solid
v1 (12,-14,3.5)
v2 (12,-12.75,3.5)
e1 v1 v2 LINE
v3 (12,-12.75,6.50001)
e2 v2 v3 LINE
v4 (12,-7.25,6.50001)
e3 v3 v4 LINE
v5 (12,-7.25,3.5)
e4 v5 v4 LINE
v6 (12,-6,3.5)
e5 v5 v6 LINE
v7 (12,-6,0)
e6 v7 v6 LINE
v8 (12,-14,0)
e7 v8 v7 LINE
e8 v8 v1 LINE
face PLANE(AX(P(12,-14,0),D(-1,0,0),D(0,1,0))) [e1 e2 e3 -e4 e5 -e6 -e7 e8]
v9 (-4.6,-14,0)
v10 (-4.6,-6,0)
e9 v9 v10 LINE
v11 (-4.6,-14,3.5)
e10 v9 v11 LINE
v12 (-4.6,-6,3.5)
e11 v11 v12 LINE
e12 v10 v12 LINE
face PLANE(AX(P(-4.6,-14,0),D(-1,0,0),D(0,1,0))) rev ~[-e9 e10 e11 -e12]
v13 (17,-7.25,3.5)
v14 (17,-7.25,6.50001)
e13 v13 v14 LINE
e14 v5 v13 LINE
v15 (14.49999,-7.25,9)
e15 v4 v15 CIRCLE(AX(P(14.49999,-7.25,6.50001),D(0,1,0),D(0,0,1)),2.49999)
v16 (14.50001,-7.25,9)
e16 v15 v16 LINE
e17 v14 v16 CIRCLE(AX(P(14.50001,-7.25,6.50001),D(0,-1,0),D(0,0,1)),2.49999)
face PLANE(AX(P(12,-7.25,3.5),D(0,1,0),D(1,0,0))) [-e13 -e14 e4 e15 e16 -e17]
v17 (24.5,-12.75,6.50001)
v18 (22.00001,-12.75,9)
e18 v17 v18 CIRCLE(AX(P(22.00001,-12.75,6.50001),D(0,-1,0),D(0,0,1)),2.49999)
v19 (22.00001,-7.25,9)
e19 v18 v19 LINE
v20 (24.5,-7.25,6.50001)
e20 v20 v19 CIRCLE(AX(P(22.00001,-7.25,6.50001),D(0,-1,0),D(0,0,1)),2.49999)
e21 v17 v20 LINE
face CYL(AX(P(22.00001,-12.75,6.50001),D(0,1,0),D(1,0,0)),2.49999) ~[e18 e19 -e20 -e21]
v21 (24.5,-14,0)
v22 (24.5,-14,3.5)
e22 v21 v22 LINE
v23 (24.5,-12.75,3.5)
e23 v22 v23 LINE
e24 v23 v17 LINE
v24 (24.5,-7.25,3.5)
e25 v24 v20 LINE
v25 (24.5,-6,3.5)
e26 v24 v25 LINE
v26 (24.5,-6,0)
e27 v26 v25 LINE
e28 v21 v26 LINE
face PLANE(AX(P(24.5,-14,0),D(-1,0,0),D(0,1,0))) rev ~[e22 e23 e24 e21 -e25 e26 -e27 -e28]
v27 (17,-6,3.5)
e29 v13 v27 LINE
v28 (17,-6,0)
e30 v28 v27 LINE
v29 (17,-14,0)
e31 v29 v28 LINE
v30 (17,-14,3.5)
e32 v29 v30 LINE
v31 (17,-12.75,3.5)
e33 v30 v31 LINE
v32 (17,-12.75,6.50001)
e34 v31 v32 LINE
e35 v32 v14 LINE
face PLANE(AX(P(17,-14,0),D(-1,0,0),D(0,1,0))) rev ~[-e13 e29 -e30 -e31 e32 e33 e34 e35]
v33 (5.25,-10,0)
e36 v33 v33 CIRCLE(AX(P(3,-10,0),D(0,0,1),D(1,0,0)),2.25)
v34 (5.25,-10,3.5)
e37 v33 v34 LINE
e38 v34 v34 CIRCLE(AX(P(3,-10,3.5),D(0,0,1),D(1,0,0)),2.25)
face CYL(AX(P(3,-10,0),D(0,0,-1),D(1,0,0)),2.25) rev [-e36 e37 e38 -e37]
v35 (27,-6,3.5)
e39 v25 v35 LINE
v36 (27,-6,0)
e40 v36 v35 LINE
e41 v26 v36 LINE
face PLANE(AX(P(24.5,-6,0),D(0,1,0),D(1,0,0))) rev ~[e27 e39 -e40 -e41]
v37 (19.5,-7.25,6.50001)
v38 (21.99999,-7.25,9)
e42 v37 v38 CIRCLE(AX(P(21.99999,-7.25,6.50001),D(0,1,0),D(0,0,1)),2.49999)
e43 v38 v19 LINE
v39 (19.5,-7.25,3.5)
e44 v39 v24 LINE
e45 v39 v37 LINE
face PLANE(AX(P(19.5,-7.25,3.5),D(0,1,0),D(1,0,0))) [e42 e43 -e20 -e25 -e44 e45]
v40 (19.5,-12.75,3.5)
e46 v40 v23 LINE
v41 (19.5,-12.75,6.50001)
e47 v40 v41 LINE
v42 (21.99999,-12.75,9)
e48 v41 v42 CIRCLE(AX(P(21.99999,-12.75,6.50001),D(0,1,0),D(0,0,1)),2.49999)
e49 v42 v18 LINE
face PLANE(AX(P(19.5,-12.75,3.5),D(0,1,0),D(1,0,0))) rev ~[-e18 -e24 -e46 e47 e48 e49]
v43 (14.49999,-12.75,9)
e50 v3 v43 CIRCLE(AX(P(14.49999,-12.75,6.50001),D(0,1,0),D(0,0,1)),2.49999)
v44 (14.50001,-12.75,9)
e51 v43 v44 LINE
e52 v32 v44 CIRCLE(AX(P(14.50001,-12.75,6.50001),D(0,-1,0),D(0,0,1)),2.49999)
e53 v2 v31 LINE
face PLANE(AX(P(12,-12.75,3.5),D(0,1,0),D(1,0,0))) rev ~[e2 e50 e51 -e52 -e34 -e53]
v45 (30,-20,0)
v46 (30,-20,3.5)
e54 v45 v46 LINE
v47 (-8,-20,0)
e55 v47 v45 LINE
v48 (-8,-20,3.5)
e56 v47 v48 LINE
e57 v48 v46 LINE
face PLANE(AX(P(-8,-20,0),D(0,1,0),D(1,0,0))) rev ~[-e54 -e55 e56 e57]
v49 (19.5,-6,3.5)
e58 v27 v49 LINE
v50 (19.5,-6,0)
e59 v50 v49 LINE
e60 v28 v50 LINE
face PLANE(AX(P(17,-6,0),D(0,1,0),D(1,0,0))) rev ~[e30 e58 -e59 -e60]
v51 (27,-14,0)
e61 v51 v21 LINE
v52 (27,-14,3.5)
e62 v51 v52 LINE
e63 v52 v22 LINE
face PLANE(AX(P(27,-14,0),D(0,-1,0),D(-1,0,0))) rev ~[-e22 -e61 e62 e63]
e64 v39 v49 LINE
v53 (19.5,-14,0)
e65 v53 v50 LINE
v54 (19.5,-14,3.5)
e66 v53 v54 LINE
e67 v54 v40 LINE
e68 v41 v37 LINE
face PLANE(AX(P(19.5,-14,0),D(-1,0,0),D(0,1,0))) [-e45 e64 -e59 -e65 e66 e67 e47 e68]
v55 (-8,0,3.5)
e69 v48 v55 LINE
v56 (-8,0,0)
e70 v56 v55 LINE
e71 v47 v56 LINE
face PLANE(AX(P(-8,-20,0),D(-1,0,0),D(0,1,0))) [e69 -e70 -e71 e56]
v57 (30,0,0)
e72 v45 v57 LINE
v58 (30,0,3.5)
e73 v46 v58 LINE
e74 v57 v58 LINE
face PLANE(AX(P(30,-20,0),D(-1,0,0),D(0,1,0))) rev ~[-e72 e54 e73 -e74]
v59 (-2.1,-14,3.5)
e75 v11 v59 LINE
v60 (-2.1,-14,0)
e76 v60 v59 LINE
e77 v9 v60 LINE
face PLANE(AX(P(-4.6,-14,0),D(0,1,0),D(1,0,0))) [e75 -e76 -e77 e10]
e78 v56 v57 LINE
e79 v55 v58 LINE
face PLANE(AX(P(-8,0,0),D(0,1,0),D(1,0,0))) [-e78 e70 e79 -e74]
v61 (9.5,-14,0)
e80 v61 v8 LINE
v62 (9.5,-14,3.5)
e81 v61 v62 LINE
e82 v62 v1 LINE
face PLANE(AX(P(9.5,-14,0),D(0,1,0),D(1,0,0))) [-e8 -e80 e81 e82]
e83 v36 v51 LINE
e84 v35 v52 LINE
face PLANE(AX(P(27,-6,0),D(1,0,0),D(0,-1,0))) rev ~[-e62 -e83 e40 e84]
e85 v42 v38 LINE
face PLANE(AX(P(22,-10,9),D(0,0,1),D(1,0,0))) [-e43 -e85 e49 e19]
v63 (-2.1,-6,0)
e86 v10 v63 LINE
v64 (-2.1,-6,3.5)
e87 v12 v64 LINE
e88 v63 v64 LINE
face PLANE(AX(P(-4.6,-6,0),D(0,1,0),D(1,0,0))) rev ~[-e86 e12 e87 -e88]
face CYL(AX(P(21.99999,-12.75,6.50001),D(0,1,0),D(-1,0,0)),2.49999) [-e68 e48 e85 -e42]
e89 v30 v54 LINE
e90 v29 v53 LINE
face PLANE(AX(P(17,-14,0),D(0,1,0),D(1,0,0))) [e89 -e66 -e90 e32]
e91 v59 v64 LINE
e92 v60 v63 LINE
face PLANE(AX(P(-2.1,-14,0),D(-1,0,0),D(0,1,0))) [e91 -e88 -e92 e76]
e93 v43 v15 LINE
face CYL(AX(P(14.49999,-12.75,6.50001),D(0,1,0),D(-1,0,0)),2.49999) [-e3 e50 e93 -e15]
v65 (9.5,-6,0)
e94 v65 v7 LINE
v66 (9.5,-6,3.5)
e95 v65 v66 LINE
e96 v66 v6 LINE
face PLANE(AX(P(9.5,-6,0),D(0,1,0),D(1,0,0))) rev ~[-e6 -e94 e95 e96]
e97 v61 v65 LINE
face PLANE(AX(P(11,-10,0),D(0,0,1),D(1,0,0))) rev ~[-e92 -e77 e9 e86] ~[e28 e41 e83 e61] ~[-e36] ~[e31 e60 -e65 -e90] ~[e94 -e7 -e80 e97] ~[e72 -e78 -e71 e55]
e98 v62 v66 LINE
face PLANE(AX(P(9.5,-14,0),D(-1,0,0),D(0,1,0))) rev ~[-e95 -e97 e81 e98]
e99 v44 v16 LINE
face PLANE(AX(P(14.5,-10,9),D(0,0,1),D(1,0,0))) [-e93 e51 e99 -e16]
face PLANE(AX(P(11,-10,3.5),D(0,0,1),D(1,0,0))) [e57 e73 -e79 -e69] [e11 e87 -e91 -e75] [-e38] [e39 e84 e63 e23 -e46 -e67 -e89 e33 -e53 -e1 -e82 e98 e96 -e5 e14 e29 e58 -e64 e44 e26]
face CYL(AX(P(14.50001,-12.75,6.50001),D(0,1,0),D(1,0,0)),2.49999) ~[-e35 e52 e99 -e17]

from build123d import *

# Parameters (mm, degrees)
F0_W     = 38
F0_H     = 20
F0_W_2   = 2.5
F0_H_2   = 8
F0_R     = 2.25
F1_DEPTH = 3.5
F2_W     = 5
F2_H     = 5.5
F3_DEPTH = 5.5
F4_R     = 2.49999


# Not quite as in the source:
# - a fillet or chamfer is up to 0.001 mm smaller than in the source, because OpenCascade refuses the exact size


with BuildPart() as f1:
    # F0 (on Top) → F1 (new body)
    with BuildSketch(Plane.XY):
        with Locations((11, -10)):
            Rectangle(F0_W, F0_H)
        with Locations((-3.3499999251, -10)):
            Rectangle(F0_W_2, F0_H_2, mode=Mode.SUBTRACT)
        with Locations((3, -10)):
            Circle(F0_R, mode=Mode.SUBTRACT)
        with Locations((10.75, -10)):
            Rectangle(F0_W_2, F0_H_2, mode=Mode.SUBTRACT)
        with Locations((18.25, -10)):
            Rectangle(F0_W_2, F0_H_2, mode=Mode.SUBTRACT)
        Polygon((24.5, -10), (24.5, -6), (27, -6), (27, -14), (24.5, -14), align=None, mode=Mode.SUBTRACT)
    extrude(amount=F1_DEPTH)

    # F2 (on face) → F3 (join)
    with BuildSketch(Plane.XY.offset(3.5)):
        with Locations((22, -10)):
            Rectangle(F2_W, F2_H)
        with Locations((14.5, -10)):
            Rectangle(F2_W, F2_H)
    extrude(amount=F3_DEPTH)

    # F4 (radius 2.5 in the source; OpenCascade refuses exactly that, so slightly less here)
    f4_edges = [f1.edges().sort_by_distance(p)[0] for p in [
        (12, -10, 9),
        (17, -10, 9),
        (19.5, -10, 9),
        (24.5, -10, 9),
    ]]
    fillet(f4_edges, radius=F4_R)


solid = f1.part
